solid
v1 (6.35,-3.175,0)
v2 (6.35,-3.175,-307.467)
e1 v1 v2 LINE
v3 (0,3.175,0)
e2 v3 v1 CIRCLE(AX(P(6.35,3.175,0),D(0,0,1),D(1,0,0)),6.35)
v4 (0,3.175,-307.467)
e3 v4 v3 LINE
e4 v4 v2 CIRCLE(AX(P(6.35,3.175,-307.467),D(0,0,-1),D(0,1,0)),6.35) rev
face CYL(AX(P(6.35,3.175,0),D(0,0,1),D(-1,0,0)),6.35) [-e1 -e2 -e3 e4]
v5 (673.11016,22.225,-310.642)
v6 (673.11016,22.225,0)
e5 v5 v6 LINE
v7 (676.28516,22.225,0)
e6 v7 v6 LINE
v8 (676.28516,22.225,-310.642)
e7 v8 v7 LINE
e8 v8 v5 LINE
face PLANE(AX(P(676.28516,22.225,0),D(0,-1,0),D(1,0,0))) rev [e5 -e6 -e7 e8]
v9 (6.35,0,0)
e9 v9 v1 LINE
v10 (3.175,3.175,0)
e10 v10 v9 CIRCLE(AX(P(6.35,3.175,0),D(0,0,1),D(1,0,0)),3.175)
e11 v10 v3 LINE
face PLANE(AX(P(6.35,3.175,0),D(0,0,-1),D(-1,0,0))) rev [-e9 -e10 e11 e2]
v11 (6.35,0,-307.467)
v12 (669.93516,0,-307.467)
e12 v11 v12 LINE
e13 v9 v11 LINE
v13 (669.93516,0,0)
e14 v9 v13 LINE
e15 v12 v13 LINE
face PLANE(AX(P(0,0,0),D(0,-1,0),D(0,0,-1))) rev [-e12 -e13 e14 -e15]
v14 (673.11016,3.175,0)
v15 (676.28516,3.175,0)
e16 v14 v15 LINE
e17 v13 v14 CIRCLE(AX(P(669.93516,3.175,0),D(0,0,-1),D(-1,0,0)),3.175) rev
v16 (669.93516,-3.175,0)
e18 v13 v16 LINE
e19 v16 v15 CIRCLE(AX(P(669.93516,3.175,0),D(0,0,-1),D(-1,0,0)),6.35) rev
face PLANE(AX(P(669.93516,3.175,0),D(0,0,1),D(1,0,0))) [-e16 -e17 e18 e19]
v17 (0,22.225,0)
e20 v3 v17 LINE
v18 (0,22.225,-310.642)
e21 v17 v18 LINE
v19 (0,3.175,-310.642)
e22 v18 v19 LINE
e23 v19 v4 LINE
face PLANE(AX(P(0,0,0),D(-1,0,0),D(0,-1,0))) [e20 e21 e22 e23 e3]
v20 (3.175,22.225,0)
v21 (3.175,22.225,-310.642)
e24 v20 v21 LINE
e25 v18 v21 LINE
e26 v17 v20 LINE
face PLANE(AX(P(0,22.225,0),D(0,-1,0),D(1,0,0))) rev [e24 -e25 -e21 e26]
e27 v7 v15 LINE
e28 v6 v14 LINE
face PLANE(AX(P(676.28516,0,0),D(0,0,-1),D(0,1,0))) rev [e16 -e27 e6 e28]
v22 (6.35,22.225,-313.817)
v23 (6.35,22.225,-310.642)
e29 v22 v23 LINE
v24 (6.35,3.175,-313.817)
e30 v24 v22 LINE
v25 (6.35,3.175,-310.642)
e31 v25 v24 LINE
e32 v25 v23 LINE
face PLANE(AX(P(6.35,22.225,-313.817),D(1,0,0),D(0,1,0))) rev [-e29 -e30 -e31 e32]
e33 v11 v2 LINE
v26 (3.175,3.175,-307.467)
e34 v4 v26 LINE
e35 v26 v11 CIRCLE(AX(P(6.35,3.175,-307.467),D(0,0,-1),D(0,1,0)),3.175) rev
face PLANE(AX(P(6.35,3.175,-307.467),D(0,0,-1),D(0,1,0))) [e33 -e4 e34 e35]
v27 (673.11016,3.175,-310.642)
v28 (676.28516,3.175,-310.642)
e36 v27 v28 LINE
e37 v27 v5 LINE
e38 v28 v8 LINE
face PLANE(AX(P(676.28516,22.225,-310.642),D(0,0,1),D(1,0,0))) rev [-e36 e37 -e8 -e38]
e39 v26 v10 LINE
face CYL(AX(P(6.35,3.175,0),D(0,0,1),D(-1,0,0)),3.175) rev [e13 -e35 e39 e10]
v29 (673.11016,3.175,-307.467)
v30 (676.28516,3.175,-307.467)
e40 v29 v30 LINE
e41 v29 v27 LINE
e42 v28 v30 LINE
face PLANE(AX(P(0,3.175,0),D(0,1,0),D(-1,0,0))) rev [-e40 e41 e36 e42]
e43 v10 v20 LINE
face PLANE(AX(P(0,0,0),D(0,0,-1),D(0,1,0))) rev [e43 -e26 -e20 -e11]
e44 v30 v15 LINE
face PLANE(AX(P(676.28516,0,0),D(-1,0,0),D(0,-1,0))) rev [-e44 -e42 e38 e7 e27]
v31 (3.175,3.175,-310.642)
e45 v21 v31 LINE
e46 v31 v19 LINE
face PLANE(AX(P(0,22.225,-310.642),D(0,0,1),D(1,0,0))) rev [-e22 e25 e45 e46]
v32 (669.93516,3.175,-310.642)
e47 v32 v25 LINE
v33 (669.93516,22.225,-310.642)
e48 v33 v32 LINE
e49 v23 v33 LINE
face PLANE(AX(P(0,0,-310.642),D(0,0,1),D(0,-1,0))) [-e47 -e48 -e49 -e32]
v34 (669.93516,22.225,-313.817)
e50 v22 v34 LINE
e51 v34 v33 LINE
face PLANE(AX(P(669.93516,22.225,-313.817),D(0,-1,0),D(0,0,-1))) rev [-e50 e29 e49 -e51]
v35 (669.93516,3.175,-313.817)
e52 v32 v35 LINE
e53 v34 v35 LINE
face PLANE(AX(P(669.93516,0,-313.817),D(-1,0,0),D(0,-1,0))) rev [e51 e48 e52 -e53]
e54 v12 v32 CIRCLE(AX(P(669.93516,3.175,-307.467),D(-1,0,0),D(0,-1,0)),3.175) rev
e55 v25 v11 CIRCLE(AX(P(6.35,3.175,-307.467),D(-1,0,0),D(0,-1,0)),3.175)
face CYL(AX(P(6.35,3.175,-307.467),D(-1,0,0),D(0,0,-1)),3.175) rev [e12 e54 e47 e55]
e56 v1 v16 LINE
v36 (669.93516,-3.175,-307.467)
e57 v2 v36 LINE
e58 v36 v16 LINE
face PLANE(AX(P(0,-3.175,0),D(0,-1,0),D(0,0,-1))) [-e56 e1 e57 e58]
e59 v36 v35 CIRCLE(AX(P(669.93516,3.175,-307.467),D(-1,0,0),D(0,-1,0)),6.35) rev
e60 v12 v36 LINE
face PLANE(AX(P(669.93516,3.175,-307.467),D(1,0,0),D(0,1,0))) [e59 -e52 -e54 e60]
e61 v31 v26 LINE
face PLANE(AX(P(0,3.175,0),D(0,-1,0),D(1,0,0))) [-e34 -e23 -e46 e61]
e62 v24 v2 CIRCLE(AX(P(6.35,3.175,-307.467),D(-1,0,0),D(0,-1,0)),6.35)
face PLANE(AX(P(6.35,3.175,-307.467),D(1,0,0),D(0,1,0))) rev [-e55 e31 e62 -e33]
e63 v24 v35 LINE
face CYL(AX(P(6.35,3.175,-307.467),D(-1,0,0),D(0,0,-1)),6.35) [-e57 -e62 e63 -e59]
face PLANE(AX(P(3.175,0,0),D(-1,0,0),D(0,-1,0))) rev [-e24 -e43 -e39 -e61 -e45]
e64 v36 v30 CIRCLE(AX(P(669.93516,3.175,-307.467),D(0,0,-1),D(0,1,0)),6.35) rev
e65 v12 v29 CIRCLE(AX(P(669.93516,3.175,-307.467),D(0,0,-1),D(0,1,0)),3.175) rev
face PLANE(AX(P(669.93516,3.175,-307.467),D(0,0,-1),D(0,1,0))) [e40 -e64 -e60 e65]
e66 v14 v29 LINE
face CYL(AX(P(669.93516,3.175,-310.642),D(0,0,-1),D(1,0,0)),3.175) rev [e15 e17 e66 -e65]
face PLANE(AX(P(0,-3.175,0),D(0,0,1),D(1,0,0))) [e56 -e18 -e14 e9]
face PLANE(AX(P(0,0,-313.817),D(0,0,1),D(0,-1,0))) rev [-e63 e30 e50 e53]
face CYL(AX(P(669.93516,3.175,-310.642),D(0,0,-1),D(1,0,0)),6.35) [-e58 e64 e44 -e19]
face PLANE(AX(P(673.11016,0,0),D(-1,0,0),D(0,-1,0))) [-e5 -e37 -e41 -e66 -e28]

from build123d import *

# Parameters (mm, degrees)
SKETCH1_W                      = 676.28516
SKETCH1_H                      = 310.642
BASE_FLANGE1_DEPTH             = 3.175
EDGE_FLANGE2_STRIP_W           = 19.05
EDGE_FLANGE2_STRIP_H           = 3.175
EDGE_FLANGE2_STRIP_CUT_DEPTH   = 310.642
EDGE_FLANGE2_STRIP_2_W         = 19.05
EDGE_FLANGE2_STRIP_2_H         = 3.175
EDGE_FLANGE2_STRIP_CUT_2_DEPTH = 310.642
EDGE_FLANGE2_DEPTH             = 310.642
EDGE_FLANGE2_BEND_DEPTH        = 310.642
EDGE_FLANGE3_DEPTH             = 676.28516
EDGE_FLANGE3_2_DEPTH           = 6.35
EDGE_FLANGE3_START             = 669.93516
EDGE_FLANGE3_3_DEPTH           = 6.35
EDGE_FLANGE3_START_2           = 6.35
EDGE_FLANGE3_4_DEPTH           = 663.58516


# Read off the part's stored shape, not the designer's step: Edge-Flange3
# Sheet-metal steps are written as plain solids
with BuildPart() as part:
    # Sketch1 → Base-Flange1 (new body)
    with BuildSketch(Plane(origin=(0, 0, 0), x_dir=(1, 0, 0), z_dir=(0, 1, 0))):
        with Locations((338.14258, 155.321)):
            Rectangle(SKETCH1_W, SKETCH1_H)
    extrude(amount=-BASE_FLANGE1_DEPTH)

    # Edge-Flange2 strip (across the edge) → Edge-Flange2 strip cut (cut)
    with BuildSketch(Plane(origin=(676.28516, 0, 0), x_dir=(-1, 0, 0), z_dir=(0, 0, -1))):
        with Locations((-3.175, -1.5875)):
            Rectangle(EDGE_FLANGE2_STRIP_W, EDGE_FLANGE2_STRIP_H)
    extrude(amount=EDGE_FLANGE2_STRIP_CUT_DEPTH, mode=Mode.SUBTRACT)

    # Edge-Flange2 strip 2 (across the edge) → Edge-Flange2 strip cut 2 (cut)
    with BuildSketch(Plane.XY.offset(-310.642)):
        with Locations((-3.175, -1.5875)):
            Rectangle(EDGE_FLANGE2_STRIP_2_W, EDGE_FLANGE2_STRIP_2_H)
    extrude(amount=EDGE_FLANGE2_STRIP_CUT_2_DEPTH, mode=Mode.SUBTRACT)

    # Edge-Flange2 section (across the edge) → Edge-Flange2 (add)
    with BuildSketch(Plane(origin=(676.28516, 0, 0), x_dir=(-1, 0, 0), z_dir=(0, 0, -1))):
        with BuildLine():
            Line((0, 3.175), (0, 22.225))
            Line((0, 22.225), (3.175, 22.225))
            Line((3.175, 22.225), (3.175, 3.175))
            ThreePointArc((3.175, 3.175), (4.10493597, 0.92993597), (6.35, 0))
            Line((6.35, 0), (6.35, -3.175))
            ThreePointArc((6.35, -3.175), (1.859871939, -1.315128061), (0, 3.175))
        make_face()
    extrude(amount=EDGE_FLANGE2_DEPTH)

    # Edge-Flange2 section 2 (across the edge) → Edge-Flange2 bend (add)
    with BuildSketch(Plane.XY.offset(-310.642)):
        with BuildLine():
            Line((0, 3.175), (0, 22.225))
            Line((0, 22.225), (3.175, 22.225))
            Line((3.175, 22.225), (3.175, 3.175))
            ThreePointArc((3.175, 3.175), (4.10493597, 0.92993597), (6.35, 0))
            Line((6.35, 0), (6.35, -3.175))
            ThreePointArc((6.35, -3.175), (1.859871939, -1.315128061), (0, 3.175))
        make_face()
    extrude(amount=EDGE_FLANGE2_BEND_DEPTH)

    # Edge-Flange3 outline → Edge-Flange3 (cut)
    with BuildSketch(Plane.YZ):
        with BuildLine():
            Line((3.175, -310.642), (3.175, -307.467))
            Line((3.175, -307.467), (0, -307.467))
            ThreePointArc((0, -307.467), (0.92993597, -309.71206403), (3.175, -310.642))
        make_face()
        with BuildLine():
            ThreePointArc((-2.324261315, -310.642), (-2.958628997, -309.110500936), (-3.175, -307.467))
            Line((-3.175, -307.467), (-3.175, -310.642))
            Line((-3.175, -310.642), (-2.324261315, -310.642))
        make_face()
    extrude(amount=EDGE_FLANGE3_DEPTH, mode=Mode.SUBTRACT)

    # Edge-Flange3 2 outline → Edge-Flange3 2 (cut)
    with BuildSketch(Plane.YZ):
        with BuildLine():
            ThreePointArc((3.175, -310.642), (0.92993597, -309.71206403), (0, -307.467))
            Line((0, -307.467), (-3.175, -307.467))
            ThreePointArc((-3.175, -307.467), (-2.958628997, -309.110500936), (-2.324261315, -310.642))
            Line((-2.324261315, -310.642), (3.175, -310.642))
        make_face()
    extrude(amount=EDGE_FLANGE3_2_DEPTH, mode=Mode.SUBTRACT)

    # Edge-Flange3 3 outline → Edge-Flange3 3 (cut)
    with BuildSketch(Plane.YZ.offset(EDGE_FLANGE3_START)):
        with BuildLine():
            ThreePointArc((3.175, -310.642), (0.92993597, -309.71206403), (0, -307.467))
            Line((0, -307.467), (-3.175, -307.467))
            ThreePointArc((-3.175, -307.467), (-2.958628997, -309.110500936), (-2.324261315, -310.642))
            Line((-2.324261315, -310.642), (3.175, -310.642))
        make_face()
    extrude(amount=EDGE_FLANGE3_3_DEPTH, mode=Mode.SUBTRACT)

    # Edge-Flange3 4 outline → Edge-Flange3 4 (add)
    with BuildSketch(Plane.YZ.offset(EDGE_FLANGE3_START_2)):
        with BuildLine():
            Line((0, -307.467), (0, -310.642))
            Line((0, -310.642), (-2.324261315, -310.642))
            ThreePointArc((-2.324261315, -310.642), (-1e-09, -312.966261314), (3.175, -313.817))
            Line((3.175, -313.817), (22.225, -313.817))
            Line((22.225, -313.817), (22.225, -310.642))
            Line((22.225, -310.642), (3.175, -310.642))
            ThreePointArc((3.175, -310.642), (0.92993597, -309.71206403), (0, -307.467))
        make_face()
    extrude(amount=EDGE_FLANGE3_4_DEPTH)


solid = part.part
